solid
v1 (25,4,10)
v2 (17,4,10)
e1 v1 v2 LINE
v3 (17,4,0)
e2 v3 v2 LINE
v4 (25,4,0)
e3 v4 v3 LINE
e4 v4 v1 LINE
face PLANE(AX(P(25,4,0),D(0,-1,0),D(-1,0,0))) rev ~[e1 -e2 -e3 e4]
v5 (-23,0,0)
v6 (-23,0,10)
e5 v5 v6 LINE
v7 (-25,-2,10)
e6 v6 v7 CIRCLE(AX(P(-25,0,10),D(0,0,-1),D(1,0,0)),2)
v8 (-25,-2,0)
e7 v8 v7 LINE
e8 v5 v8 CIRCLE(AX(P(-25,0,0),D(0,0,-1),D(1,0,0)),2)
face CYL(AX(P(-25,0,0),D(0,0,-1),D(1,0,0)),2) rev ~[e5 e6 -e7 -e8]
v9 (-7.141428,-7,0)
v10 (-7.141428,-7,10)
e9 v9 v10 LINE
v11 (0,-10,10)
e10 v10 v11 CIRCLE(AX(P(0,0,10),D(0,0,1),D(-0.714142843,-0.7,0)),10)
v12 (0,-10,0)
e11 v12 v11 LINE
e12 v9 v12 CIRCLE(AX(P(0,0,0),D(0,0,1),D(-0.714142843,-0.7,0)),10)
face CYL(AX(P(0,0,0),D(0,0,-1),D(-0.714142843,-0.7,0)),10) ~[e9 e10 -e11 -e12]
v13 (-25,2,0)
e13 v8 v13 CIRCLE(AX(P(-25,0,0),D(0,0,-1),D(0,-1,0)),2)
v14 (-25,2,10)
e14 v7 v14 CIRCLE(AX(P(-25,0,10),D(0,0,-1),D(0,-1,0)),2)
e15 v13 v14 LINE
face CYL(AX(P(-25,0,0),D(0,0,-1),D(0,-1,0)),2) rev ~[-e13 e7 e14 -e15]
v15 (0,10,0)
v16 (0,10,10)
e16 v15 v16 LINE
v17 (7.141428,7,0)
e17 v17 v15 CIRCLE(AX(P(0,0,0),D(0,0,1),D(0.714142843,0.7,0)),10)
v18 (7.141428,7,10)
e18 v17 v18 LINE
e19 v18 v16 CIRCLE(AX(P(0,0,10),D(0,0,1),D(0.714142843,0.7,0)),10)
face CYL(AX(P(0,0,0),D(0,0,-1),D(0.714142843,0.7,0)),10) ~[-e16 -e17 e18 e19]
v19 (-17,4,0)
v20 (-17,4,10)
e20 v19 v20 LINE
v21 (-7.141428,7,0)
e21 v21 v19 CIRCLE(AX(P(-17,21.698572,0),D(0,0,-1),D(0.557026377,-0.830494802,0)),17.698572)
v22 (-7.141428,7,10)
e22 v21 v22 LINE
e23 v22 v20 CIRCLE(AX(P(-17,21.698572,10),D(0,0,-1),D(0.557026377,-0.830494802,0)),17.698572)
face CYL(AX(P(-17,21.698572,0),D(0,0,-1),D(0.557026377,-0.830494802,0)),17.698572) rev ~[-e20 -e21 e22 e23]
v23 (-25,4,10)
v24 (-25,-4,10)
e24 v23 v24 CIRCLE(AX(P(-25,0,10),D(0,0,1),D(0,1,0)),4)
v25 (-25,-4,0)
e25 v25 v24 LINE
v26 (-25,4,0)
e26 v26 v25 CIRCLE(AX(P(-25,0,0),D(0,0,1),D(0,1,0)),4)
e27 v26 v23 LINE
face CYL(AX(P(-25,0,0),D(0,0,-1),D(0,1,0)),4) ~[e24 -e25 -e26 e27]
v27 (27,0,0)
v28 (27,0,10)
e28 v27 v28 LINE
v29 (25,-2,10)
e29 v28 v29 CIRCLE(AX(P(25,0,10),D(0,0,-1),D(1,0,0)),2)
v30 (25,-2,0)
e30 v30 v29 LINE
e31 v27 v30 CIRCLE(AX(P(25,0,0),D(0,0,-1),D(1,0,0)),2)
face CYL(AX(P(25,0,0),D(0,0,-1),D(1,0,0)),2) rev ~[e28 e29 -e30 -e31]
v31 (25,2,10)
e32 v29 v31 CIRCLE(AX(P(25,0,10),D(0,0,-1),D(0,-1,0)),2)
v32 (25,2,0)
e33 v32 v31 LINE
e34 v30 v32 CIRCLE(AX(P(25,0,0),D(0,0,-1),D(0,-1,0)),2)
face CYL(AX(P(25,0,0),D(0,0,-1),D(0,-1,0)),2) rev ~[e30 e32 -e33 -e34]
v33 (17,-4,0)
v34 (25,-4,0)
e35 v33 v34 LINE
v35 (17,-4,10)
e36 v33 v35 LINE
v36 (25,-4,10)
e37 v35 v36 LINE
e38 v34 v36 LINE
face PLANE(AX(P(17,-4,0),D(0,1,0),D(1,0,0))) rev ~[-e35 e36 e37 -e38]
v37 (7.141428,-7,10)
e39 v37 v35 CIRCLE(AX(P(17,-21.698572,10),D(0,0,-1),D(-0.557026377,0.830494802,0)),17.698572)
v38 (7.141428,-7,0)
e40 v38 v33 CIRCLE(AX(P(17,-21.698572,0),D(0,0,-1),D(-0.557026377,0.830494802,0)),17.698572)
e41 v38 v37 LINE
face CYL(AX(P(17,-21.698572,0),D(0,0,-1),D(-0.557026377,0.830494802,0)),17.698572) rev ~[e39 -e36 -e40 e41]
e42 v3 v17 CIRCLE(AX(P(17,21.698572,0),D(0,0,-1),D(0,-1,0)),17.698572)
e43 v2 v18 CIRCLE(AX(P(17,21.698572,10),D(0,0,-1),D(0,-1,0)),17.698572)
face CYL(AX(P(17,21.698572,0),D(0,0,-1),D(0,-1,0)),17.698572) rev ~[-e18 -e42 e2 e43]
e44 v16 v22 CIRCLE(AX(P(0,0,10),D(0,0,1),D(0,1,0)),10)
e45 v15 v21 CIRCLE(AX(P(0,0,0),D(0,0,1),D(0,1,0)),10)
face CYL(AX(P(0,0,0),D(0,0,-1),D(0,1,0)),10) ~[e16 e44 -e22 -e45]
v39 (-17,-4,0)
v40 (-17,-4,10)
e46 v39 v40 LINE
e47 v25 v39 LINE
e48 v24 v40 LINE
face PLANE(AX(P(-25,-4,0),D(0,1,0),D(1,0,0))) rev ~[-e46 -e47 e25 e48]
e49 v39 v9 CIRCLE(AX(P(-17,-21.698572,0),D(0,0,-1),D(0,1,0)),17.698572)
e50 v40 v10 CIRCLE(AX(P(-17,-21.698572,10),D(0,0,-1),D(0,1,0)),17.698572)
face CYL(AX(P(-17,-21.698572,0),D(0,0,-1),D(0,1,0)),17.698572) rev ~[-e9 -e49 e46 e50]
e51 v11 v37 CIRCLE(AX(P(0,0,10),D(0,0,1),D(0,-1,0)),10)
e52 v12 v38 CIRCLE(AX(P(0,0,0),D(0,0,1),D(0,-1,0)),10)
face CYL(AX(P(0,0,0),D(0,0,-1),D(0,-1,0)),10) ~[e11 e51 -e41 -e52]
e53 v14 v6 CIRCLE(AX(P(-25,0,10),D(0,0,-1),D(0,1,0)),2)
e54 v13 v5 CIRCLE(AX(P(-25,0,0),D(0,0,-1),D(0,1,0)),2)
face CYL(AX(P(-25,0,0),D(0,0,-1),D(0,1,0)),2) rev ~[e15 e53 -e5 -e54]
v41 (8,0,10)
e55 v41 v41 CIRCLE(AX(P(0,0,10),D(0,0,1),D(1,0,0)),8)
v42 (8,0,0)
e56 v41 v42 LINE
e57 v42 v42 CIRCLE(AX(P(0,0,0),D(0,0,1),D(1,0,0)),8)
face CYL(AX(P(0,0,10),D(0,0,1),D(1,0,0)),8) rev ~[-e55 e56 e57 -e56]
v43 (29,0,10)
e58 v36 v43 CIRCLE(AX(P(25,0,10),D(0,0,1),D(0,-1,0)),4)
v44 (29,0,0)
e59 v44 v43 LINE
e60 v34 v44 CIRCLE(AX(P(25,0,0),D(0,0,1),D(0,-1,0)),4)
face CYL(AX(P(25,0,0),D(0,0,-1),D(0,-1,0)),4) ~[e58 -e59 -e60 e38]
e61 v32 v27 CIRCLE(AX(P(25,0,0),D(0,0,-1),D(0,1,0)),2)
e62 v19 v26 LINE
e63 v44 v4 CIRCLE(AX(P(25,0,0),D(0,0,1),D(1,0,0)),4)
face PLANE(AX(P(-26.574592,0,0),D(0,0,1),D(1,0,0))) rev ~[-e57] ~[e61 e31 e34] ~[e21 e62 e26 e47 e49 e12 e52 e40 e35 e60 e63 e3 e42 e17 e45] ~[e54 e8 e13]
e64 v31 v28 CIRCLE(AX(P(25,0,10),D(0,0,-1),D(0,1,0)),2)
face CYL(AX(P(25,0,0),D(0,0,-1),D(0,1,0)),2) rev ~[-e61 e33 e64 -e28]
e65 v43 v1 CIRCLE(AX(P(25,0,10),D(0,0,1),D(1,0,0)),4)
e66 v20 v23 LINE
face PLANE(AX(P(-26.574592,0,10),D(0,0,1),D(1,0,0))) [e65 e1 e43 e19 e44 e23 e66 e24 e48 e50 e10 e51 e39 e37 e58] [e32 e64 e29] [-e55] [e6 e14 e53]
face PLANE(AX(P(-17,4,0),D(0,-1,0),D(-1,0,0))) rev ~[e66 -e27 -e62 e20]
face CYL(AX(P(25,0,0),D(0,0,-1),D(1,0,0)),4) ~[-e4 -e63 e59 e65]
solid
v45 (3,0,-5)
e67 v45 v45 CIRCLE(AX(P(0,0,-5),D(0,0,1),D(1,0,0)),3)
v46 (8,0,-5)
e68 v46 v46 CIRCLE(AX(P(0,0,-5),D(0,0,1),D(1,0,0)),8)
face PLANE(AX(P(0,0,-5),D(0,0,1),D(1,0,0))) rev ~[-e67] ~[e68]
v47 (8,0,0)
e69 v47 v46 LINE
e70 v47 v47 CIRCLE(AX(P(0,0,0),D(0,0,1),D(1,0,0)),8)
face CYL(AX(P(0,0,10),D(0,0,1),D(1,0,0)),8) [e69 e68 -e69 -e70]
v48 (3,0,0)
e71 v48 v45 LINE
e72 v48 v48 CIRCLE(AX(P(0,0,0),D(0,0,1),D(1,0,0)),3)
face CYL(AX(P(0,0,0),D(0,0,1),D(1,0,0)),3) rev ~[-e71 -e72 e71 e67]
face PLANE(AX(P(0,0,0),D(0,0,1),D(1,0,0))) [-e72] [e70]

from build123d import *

# Parameters (mm, degrees)
F1_DEPTH = 10
F2_R     = 8
F3_DEPTH = 15
F4_R     = 8
F5_DEPTH = 10
F6_R     = 3
F7_DEPTH = 25


with BuildPart() as f1:
    # F0 (on Top) → F1 (new body)
    with BuildSketch(Plane.XY):
        with BuildLine():
            Line((-25, 2), (-25, 4))
            ThreePointArc((-25, 4), (-29, 0), (-25, -4))
            Line((-25, -4), (-25, -2))
            ThreePointArc((-25, -2), (-27, 0), (-25, 2))
        make_face()
        with BuildLine():
            ThreePointArc((-21, 0), (-22.1715728753, 2.8284271247), (-25, 4))
            Line((-25, 4), (-25, 2))
            ThreePointArc((-25, 2), (-23.5857864376, 1.4142135624), (-23, 0))
            ThreePointArc((-23, 0), (-23.5857864376, -1.4142135624), (-25, -2))
            Line((-25, -2), (-25, -4))
            ThreePointArc((-25, -4), (-22.1715728753, -2.8284271247), (-21, 0))
        make_face()
        with BuildLine():
            ThreePointArc((-7.1414284285, -7), (-10, 0), (-7.1414284285, 7))
            ThreePointArc((-7.1414284285, 7), (-11.8475386118, 4.7666024499), (-17, 4))
            Line((-17, 4), (-25, 4))
            ThreePointArc((-25, 4), (-22.1715728753, 2.8284271247), (-21, 0))
            ThreePointArc((-21, 0), (-22.1715728753, -2.8284271247), (-25, -4))
            Line((-25, -4), (-17, -4))
            ThreePointArc((-17, -4), (-11.8475386118, -4.7666024499), (-7.1414284285, -7))
        make_face()
        with BuildLine():
            Line((-2.6925824036, 7), (-7.1414284285, 7))
            ThreePointArc((-7.1414284285, 7), (-10, 0), (-7.1414284285, -7))
            Line((-7.1414284285, -7), (-2.6925824036, -7))
            ThreePointArc((-2.6925824036, -7), (-7.5, 0), (-2.6925824036, 7))
        make_face()
        with BuildLine():
            ThreePointArc((7.1414284285, -7), (9.2578151927, -3.7805896177), (10, 0))
            ThreePointArc((10, 0), (9.2578151927, 3.7805896177), (7.1414284285, 7))
            Line((7.1414284285, 7), (2.6925824036, 7))
            ThreePointArc((2.6925824036, 7), (6.1824092402, 4.2459175671), (7.5, 0))
            ThreePointArc((7.5, 0), (6.1824092402, -4.2459175671), (2.6925824036, -7))
            Line((2.6925824036, -7), (7.1414284285, -7))
        make_face()
        with BuildLine():
            ThreePointArc((7.1414284285, 7), (9.2578151927, 3.7805896177), (10, 0))
            ThreePointArc((10, 0), (9.2578151927, -3.7805896177), (7.1414284285, -7))
            ThreePointArc((7.1414284285, -7), (11.8475386118, -4.7666024499), (17, -4))
            Line((17, -4), (25, -4))
            ThreePointArc((25, -4), (21, 0), (25, 4))
            Line((25, 4), (17, 4))
            ThreePointArc((17, 4), (11.8475386118, 4.7666024499), (7.1414284285, 7))
        make_face()
        with BuildLine():
            ThreePointArc((-2.6925824036, -7), (-1.3693063938, -7.3739406019), (0, -7.5))
            Line((0, -7.5), (0, -7))
            Line((0, -7), (-2.6925824036, -7))
        make_face()
        with BuildLine():
            ThreePointArc((0, -7.5), (1.3693063938, -7.3739406019), (2.6925824036, -7))
            Line((2.6925824036, -7), (0, -7))
            Line((0, -7), (0, -7.5))
        make_face()
        with BuildLine():
            ThreePointArc((-7.1414284285, -7), (-3.8729833462, -9.2195444573), (0, -10))
            Line((0, -10), (0, -7.5))
            ThreePointArc((0, -7.5), (-1.3693063938, -7.3739406019), (-2.6925824036, -7))
            Line((-2.6925824036, -7), (-7.1414284285, -7))
        make_face()
        with BuildLine():
            ThreePointArc((0, -10), (3.8729833462, -9.2195444573), (7.1414284285, -7))
            Line((7.1414284285, -7), (2.6925824036, -7))
            ThreePointArc((2.6925824036, -7), (1.3693063938, -7.3739406019), (0, -7.5))
            Line((0, -7.5), (0, -10))
        make_face()
        with BuildLine():
            Line((0, 3), (0, 7))
            Line((0, 7), (-2.6925824036, 7))
            ThreePointArc((-2.6925824036, 7), (-7.5, 0), (-2.6925824036, -7))
            Line((-2.6925824036, -7), (0, -7))
            Line((0, -7), (0, -3))
            ThreePointArc((0, -3), (-3, 0), (0, 3))
        make_face()
        with BuildLine():
            ThreePointArc((7.5, 0), (6.1824092402, 4.2459175671), (2.6925824036, 7))
            Line((2.6925824036, 7), (0, 7))
            Line((0, 7), (0, 3))
            ThreePointArc((0, 3), (2.1213203436, 2.1213203436), (3, 0))
            ThreePointArc((3, 0), (2.1213203436, -2.1213203436), (0, -3))
            Line((0, -3), (0, -7))
            Line((0, -7), (2.6925824036, -7))
            ThreePointArc((2.6925824036, -7), (6.1824092402, -4.2459175671), (7.5, 0))
        make_face()
        with BuildLine():
            Line((25, 2), (25, 4))
            ThreePointArc((25, 4), (21, 0), (25, -4))
            Line((25, -4), (25, -2))
            ThreePointArc((25, -2), (23, 0), (25, 2))
        make_face()
        with BuildLine():
            ThreePointArc((29, 0), (27.8284271247, 2.8284271247), (25, 4))
            Line((25, 4), (25, 2))
            ThreePointArc((25, 2), (26.4142135624, 1.4142135624), (27, 0))
            ThreePointArc((27, 0), (26.4142135624, -1.4142135624), (25, -2))
            Line((25, -2), (25, -4))
            ThreePointArc((25, -4), (27.8284271247, -2.8284271247), (29, 0))
        make_face()
        with BuildLine():
            Line((0, 7), (0, 7.5))
            ThreePointArc((0, 7.5), (-1.3693063938, 7.3739406019), (-2.6925824036, 7))
            Line((-2.6925824036, 7), (0, 7))
        make_face()
        with BuildLine():
            Line((0, 7), (2.6925824036, 7))
            ThreePointArc((2.6925824036, 7), (1.3693063938, 7.3739406019), (0, 7.5))
            Line((0, 7.5), (0, 7))
        make_face()
        with BuildLine():
            Line((0, 7.5), (0, 10))
            ThreePointArc((0, 10), (-3.8729833462, 9.2195444573), (-7.1414284285, 7))
            Line((-7.1414284285, 7), (-2.6925824036, 7))
            ThreePointArc((-2.6925824036, 7), (-1.3693063938, 7.3739406019), (0, 7.5))
        make_face()
        with BuildLine():
            Line((2.6925824036, 7), (7.1414284285, 7))
            ThreePointArc((7.1414284285, 7), (3.8729833462, 9.2195444573), (0, 10))
            Line((0, 10), (0, 7.5))
            ThreePointArc((0, 7.5), (1.3693063938, 7.3739406019), (2.6925824036, 7))
        make_face()
    extrude(amount=F1_DEPTH)


with BuildPart() as f3:
    # F2 (on face) → F3 (new body)
    with BuildSketch(Plane.XY.offset(10)):
        Circle(F2_R)
    extrude(amount=-F3_DEPTH)


with BuildPart() as f5_tool:
    # F4 (on face) → F5 (new body)
    with BuildSketch(Plane.XY.offset(10)):
        Circle(F4_R)
    extrude(amount=-F5_DEPTH)


with BuildPart() as f1_1:
    add(f1.part)

    # F5: cut by f5_tool
    add(f5_tool.part, mode=Mode.SUBTRACT)


with BuildPart() as f3_1:
    add(f3.part)

    # F5: cut by f5_tool
    add(f5_tool.part, mode=Mode.SUBTRACT)

    # F6 (on Top) → F7 (cut)
    with BuildSketch(Plane.XY):
        Circle(F6_R)
    extrude(amount=-F7_DEPTH, mode=Mode.SUBTRACT)


solid = Compound([f1_1.part, f3_1.part])
